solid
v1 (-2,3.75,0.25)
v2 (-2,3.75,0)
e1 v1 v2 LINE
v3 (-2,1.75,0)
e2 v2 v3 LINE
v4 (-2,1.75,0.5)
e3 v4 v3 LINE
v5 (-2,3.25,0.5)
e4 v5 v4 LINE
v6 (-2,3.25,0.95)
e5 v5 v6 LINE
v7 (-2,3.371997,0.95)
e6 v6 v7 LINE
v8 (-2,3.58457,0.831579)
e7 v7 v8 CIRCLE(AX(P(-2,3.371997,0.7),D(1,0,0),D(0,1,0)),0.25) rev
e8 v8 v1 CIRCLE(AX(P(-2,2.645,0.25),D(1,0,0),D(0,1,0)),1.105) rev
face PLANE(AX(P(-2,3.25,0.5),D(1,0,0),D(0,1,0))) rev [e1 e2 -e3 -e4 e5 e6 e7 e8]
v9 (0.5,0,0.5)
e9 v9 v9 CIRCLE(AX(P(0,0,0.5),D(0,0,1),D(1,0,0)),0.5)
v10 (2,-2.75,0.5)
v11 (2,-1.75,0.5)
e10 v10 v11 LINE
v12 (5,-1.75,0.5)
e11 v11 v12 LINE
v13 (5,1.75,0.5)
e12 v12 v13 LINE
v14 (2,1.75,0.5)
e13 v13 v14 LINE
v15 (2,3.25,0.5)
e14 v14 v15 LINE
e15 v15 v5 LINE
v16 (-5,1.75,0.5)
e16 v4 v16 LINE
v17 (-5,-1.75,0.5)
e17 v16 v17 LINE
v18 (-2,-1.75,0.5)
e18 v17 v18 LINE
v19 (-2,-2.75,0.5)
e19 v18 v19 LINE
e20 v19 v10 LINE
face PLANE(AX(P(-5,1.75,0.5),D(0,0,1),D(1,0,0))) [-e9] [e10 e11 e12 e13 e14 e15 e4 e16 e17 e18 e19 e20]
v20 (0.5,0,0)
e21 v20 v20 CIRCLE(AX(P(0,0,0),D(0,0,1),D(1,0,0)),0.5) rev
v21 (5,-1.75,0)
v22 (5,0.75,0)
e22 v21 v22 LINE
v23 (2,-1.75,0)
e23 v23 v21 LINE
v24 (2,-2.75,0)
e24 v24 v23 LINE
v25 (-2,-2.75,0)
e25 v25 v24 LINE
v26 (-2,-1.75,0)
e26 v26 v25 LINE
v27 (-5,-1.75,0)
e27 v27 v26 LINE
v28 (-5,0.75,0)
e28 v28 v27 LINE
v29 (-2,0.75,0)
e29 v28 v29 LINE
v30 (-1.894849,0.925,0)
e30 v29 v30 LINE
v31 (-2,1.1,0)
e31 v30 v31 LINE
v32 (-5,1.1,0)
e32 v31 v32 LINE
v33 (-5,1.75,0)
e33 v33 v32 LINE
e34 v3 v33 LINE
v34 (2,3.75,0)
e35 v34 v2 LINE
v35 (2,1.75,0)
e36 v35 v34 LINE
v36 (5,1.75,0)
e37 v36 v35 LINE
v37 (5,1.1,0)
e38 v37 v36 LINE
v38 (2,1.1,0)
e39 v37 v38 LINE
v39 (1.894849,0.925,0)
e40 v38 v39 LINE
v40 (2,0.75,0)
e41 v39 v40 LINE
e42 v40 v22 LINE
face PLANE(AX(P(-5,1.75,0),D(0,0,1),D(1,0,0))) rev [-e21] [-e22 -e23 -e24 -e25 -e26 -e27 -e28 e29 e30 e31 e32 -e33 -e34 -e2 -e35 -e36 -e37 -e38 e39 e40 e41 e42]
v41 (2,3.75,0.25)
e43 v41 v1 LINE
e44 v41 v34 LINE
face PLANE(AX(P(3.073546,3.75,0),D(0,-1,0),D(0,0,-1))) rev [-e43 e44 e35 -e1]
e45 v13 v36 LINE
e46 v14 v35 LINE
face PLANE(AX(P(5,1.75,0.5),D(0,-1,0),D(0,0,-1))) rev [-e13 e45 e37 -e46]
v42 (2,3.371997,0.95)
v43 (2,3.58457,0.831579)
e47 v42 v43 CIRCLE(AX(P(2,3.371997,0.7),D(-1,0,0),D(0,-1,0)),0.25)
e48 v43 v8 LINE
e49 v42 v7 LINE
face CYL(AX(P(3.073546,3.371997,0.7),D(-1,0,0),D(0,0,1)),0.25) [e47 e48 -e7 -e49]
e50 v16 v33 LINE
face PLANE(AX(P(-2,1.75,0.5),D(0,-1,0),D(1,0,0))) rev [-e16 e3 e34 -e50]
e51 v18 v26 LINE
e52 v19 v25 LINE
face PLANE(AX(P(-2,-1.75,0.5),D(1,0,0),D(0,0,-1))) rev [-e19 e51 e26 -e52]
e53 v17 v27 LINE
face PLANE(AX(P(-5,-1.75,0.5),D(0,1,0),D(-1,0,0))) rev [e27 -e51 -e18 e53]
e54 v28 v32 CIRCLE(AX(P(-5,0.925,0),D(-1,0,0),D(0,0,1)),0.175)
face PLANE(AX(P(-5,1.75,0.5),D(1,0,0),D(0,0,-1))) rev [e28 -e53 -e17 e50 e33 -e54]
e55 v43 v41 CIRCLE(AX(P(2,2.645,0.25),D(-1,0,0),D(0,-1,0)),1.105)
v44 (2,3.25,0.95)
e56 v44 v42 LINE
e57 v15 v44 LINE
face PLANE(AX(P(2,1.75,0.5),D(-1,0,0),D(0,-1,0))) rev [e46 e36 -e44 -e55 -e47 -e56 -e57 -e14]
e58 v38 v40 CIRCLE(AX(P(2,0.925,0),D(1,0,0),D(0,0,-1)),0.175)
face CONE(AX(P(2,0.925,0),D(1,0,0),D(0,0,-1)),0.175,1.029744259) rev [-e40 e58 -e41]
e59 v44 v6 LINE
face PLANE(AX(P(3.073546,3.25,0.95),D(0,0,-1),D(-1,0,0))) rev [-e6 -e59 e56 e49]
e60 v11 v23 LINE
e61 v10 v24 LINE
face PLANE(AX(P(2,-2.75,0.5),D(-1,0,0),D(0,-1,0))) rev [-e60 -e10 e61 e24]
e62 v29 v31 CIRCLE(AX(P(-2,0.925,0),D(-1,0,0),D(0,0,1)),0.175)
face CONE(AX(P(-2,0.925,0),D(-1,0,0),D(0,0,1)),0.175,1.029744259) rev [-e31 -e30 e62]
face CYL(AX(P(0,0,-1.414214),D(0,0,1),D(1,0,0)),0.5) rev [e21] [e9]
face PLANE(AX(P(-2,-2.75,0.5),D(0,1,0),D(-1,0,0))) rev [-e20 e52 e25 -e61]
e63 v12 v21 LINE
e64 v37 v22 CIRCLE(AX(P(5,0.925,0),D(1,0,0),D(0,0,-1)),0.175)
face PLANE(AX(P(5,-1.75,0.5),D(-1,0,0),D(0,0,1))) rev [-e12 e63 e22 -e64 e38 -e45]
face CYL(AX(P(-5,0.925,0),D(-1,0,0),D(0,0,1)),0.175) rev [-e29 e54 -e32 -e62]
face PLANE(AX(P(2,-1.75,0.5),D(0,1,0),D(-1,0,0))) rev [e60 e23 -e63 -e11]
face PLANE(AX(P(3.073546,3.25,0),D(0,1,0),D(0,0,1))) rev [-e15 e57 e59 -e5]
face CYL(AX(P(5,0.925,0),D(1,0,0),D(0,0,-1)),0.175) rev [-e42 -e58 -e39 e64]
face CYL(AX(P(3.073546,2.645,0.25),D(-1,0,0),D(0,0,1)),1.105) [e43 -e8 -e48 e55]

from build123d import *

# Parameters (mm, degrees)
SALIENTE_EXTRUIR1_DEPTH             = 0.5
CROQUIS2_R                          = 0.5
CORTAR_EXTRUIR1_DEPTH               = 0.5
SALIENTE_EXTRUIR2_REACH             = 7.984
SALIENTE_EXTRUIR2_DIRECTION_2_REACH = 7.984


# Read off the part's stored shape, not the designer's step: Diámetro de taladro Ø0.35 (0.35)1
with BuildPart() as part:
    # Croquis1 → Saliente-Extruir1 (new body)
    with BuildSketch(Plane.XY):
        Polygon((-5, 1.75), (-5, -1.75), (-2, -1.75), (-2, -2.75), (2, -2.75), (2, -1.75), (5, -1.75), (5, 1.75), (2, 1.75), (2, 3.25), (-2, 3.25), (-2, 1.75), align=None)
    extrude(amount=SALIENTE_EXTRUIR1_DEPTH)

    # Croquis2 → Cortar-Extruir1 (cut)
    with BuildSketch(Plane.XY.offset(0.5)):
        Circle(CROQUIS2_R)
    extrude(amount=-CORTAR_EXTRUIR1_DEPTH, mode=Mode.SUBTRACT)

    # Saliente-Extruir2: up to this face of the body (flat: up to its plane)
    saliente_extruir2_end = Plane(part.part.faces().sort_by_distance((2, 2.5, 0.25))[0])
    # Croquis3 → Saliente-Extruir2 (add, up to the picked face)
    with BuildSketch(Plane(origin=(0, 0, 0), x_dir=(0, 0, -1), z_dir=(1, 0, 0)), mode=Mode.PRIVATE) as saliente_extruir2_sk1:
        with BuildLine():
            Line((-0.95, 3.25), (-0.95, 3.371997249))
            ThreePointArc((-0.95, 3.371997249), (-0.918397272, 3.493663315), (-0.831578947, 3.584569544))
            ThreePointArc((-0.831578947, 3.584569544), (-0.55232487, 3.707838028), (-0.25, 3.75))
            Line((-0.25, 3.75), (0, 3.75))
            Line((0, 3.75), (0, 3.25))
            Line((0, 3.25), (-0.95, 3.25))
        make_face()
    saliente_extruir2_tool1 = split(extrude(saliente_extruir2_sk1.sketch, amount=SALIENTE_EXTRUIR2_REACH, mode=Mode.PRIVATE), bisect_by=saliente_extruir2_end, keep=Keep.BOTH, mode=Mode.PRIVATE)
    add(saliente_extruir2_tool1.solids().sort_by(Axis((0, 3.476563, 0.431746), (1, 0, 0)))[0])

    # Saliente-Extruir2 direction 2: up to this face of the body (flat: up to its plane)
    saliente_extruir2_direction_2_end = Plane(part.part.faces().sort_by_distance((-2, 2.5, 0.25))[0])
    # Croquis3 → Saliente-Extruir2 direction 2 (add, up to the picked face)
    with BuildSketch(Plane(origin=(0, 0, 0), x_dir=(0, 0, -1), z_dir=(1, 0, 0)), mode=Mode.PRIVATE) as saliente_extruir2_direction_2_sk1:
        with BuildLine():
            Line((-0.95, 3.25), (-0.95, 3.371997249))
            ThreePointArc((-0.95, 3.371997249), (-0.918397272, 3.493663315), (-0.831578947, 3.584569544))
            ThreePointArc((-0.831578947, 3.584569544), (-0.55232487, 3.707838028), (-0.25, 3.75))
            Line((-0.25, 3.75), (0, 3.75))
            Line((0, 3.75), (0, 3.25))
            Line((0, 3.25), (-0.95, 3.25))
        make_face()
    saliente_extruir2_direction_2_tool1 = split(extrude(saliente_extruir2_direction_2_sk1.sketch, amount=-SALIENTE_EXTRUIR2_DIRECTION_2_REACH, mode=Mode.PRIVATE), bisect_by=saliente_extruir2_direction_2_end, keep=Keep.BOTH, mode=Mode.PRIVATE)
    add(saliente_extruir2_direction_2_tool1.solids().sort_by(Axis((0, 3.476563, 0.431746), (-1, 0, 0)))[0])

    # Diámetro de taladro Ø0.35 (0.35)1 outlin → Diámetro de taladro Ø0.35 (0.35)1 (revolve, cut)
    with BuildSketch(Plane(origin=(0, 0.925, 0), x_dir=(0, 1, 0), z_dir=(0, 0, -1))):
        Polygon((0.175, -5), (0.175, -2), (0, -1.894849392), (0, -5), align=None)
        Polygon((0, 5), (0, 1.894849392), (0.175, 2), (0.175, 5), align=None)
    revolve(axis=Axis((0, 0.925, 0), (1, 0, 0)), mode=Mode.SUBTRACT)


solid = part.part
